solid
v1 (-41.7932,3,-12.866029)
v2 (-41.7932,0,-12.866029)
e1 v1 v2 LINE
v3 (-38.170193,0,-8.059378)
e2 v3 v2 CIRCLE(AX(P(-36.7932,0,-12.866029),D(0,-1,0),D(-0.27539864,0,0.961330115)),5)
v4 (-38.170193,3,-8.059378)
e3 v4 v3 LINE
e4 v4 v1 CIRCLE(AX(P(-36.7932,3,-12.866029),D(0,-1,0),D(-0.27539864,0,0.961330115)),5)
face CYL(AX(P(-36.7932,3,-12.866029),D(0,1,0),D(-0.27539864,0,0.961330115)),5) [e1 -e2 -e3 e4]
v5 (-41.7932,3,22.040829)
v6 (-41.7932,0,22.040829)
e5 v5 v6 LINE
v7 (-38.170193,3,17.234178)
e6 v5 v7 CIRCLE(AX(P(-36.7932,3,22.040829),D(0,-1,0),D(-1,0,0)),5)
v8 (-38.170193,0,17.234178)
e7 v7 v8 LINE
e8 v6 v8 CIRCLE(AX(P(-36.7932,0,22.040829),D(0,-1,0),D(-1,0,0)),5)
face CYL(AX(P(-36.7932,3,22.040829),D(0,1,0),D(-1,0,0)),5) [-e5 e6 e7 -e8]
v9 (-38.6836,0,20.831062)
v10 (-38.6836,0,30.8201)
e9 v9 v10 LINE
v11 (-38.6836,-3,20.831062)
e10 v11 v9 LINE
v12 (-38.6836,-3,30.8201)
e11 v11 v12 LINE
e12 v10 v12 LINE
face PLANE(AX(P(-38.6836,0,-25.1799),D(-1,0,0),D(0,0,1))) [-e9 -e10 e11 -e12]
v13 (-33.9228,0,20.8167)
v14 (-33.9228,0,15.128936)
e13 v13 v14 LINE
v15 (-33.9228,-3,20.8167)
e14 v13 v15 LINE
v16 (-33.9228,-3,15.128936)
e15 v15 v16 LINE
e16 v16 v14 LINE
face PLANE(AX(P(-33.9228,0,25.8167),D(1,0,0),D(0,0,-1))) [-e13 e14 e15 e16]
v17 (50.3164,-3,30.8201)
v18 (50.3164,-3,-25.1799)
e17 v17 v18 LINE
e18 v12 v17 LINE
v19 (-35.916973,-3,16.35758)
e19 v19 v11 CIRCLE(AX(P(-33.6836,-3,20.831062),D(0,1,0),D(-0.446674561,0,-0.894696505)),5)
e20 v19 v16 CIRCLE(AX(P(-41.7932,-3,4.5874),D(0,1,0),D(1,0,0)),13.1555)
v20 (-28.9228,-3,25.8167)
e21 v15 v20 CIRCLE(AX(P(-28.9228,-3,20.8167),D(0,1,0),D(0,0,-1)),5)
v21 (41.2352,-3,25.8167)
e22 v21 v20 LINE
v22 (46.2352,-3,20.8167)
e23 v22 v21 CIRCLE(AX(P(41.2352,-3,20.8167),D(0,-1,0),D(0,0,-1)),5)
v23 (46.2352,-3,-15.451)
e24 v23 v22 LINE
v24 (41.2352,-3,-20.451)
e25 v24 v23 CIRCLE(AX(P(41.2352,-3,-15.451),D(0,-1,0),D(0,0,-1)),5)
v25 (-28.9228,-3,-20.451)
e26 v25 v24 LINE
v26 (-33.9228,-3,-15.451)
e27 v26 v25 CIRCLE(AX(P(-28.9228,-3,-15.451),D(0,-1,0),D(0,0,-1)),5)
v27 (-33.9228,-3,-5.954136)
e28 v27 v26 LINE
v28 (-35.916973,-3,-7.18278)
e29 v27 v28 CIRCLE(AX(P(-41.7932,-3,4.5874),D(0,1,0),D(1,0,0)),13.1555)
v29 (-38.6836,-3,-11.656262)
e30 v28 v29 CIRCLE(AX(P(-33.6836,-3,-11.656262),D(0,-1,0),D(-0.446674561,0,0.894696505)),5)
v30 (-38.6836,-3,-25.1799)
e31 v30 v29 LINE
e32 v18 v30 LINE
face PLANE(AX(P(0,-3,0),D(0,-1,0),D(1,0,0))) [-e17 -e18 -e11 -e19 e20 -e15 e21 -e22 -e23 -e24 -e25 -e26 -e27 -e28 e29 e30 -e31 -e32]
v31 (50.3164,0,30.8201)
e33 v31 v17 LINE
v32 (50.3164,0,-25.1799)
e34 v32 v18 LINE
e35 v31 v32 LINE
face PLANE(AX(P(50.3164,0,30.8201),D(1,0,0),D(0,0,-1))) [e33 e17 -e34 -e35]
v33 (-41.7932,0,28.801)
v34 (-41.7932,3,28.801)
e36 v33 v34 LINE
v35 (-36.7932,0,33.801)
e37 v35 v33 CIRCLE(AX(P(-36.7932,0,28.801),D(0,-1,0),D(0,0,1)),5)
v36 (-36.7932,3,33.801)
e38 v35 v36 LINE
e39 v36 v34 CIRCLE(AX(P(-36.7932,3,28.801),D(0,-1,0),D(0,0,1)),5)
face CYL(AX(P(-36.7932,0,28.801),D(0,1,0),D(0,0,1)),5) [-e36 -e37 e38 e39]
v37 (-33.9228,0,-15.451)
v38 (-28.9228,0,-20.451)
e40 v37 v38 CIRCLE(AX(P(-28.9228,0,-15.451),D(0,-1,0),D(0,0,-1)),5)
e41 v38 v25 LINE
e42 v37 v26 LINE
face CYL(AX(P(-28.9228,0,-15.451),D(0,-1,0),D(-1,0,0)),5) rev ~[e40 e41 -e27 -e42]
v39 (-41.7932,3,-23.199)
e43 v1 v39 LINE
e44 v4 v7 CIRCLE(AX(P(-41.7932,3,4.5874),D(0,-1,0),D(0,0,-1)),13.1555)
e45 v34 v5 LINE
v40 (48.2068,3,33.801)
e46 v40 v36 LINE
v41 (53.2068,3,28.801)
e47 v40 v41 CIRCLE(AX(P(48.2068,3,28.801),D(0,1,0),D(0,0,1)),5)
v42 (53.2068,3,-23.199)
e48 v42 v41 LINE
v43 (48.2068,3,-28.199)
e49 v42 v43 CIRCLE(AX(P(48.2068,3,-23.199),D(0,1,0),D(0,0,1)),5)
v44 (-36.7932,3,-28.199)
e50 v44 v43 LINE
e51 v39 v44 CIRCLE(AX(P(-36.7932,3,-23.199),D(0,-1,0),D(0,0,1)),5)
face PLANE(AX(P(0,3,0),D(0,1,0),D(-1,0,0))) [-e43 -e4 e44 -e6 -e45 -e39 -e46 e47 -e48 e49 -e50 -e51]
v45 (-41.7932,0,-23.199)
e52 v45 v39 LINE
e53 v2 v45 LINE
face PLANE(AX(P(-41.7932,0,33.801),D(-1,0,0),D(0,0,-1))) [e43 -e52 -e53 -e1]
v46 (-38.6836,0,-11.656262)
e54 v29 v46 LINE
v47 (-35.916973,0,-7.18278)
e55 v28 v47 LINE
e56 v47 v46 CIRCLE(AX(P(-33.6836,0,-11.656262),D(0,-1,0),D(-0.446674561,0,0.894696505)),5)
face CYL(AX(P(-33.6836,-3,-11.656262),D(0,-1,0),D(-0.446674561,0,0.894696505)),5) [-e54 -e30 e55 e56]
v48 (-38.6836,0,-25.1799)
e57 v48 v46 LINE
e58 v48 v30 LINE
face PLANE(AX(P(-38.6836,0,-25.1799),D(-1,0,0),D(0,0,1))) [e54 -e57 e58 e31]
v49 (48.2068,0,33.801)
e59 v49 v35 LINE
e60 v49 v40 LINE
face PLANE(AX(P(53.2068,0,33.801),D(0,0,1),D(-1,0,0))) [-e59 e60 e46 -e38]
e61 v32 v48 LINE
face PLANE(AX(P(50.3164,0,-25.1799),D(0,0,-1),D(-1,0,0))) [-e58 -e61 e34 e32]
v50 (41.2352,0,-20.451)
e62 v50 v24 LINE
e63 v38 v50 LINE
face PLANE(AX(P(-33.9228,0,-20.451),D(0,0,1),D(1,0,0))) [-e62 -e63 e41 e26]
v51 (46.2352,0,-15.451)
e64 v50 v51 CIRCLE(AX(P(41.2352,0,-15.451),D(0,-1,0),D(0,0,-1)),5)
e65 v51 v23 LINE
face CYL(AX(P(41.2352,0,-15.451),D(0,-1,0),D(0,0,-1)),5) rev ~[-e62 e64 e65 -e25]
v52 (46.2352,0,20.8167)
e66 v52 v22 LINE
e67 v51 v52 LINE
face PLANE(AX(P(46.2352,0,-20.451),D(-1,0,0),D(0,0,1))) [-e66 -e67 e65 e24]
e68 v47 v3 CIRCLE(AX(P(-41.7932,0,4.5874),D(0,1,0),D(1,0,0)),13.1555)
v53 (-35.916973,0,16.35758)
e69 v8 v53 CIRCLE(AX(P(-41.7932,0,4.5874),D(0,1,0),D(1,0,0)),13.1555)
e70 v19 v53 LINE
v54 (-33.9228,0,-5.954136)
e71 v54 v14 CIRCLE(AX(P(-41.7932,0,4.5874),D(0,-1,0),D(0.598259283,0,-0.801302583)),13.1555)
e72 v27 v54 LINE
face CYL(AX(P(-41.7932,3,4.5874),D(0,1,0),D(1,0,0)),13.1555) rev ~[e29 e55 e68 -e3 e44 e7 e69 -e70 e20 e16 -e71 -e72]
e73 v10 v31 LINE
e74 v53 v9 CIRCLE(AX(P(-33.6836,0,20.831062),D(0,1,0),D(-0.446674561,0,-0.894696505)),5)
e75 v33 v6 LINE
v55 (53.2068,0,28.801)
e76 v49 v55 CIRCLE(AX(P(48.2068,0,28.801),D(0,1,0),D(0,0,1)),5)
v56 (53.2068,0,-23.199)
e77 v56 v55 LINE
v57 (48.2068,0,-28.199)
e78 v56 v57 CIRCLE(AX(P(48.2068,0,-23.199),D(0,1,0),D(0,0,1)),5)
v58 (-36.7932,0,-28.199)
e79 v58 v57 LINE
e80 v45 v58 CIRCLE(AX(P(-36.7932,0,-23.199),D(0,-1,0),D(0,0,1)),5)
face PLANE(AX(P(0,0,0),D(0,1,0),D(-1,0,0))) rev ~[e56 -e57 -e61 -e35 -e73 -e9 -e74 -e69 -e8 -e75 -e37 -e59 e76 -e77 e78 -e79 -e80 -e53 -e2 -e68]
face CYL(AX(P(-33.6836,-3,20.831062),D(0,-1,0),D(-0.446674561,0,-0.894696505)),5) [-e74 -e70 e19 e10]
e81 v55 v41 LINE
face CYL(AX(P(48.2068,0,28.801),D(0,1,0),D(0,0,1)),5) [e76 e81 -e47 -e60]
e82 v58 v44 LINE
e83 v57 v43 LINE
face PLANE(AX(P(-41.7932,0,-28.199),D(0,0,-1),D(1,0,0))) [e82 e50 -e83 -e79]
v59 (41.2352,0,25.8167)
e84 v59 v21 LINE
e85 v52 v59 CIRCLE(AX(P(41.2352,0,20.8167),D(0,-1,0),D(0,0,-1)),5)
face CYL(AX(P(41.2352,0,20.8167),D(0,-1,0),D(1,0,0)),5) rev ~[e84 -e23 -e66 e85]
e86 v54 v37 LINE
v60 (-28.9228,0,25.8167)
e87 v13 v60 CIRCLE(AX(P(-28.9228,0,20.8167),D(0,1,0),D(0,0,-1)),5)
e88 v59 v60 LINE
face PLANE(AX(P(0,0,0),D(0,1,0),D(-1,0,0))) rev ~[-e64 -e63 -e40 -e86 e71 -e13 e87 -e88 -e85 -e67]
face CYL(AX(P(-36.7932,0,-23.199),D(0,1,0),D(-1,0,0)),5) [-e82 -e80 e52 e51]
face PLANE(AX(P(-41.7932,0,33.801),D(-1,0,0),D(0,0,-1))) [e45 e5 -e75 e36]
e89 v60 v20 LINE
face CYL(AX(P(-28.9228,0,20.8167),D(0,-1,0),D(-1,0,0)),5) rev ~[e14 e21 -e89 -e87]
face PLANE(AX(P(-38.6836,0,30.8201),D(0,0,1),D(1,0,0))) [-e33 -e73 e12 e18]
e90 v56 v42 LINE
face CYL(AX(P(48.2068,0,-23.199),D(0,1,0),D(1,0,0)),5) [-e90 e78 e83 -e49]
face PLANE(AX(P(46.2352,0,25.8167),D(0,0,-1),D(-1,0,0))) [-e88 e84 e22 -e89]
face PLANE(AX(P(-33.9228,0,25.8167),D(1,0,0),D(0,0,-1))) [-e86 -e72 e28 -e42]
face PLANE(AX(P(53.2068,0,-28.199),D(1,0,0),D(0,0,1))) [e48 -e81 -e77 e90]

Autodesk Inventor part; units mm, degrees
ref_plane "YZ Plane" through (0, 0, 0) normal (1, 0, 0) x (0, 1, 0)
ref_plane "XZ Plane" through (0, 0, 0) normal (0, 1, 0) x (-1, 0, 0)
ref_plane "XY Plane" through (0, 0, 0) normal (0, 0, 1) x (1, 0, 0)
sketch "Skizze1" plane through (0, 0, 0) normal (0, 1, 0) x (-1, 0, 0)
  line L0 (-53.2068, 33.801) -> (41.7932, 33.801)
  line L1 (41.7932, 33.801) -> (41.7932, -28.199)
  line L2 (41.7932, -28.199) -> (-53.2068, -28.199)
  line L3 (-53.2068, -28.199) -> (-53.2068, 33.801)
  line L4 (-50.2068, 30.801) -> (38.7932, 30.801)
  line L5 (38.7932, 30.801) -> (38.7932, -25.199)
  line L6 (38.7932, -25.199) -> (-50.2068, -25.199)
  line L7 (-50.2068, -25.199) -> (-50.2068, 30.801)
  point P0 (0, 0)
  point P1 (-48.7827, 30.712)
  dimension "d0" = 95
  dimension "d1" = 62
  dimension "d2" = 89
  dimension "d3" = 56
  dimension "d4" = 3
  dimension "d5" = 3
extrude "Extrusion1" add sketch "Skizze1" along normal blind 3 contours L0 L1 L2 L3 | L4 L5 L6 L7
fillet "Rundung1" radius 5 4 edges at (-41.7932, 1.5, -28.199) (53.2068, 1.5, -28.199) (-41.7932, 1.5, 33.801) (53.2068, 1.5, 33.801)
sketch "Skizze2" plane through (0, 0, 0) normal (0, -1, 0) x (1, 0, 0)
  line L0 (-41.6836, 33.8201) -> (53.3164, 33.8201)
  line L1 (53.3164, 33.8201) -> (53.3164, -28.1799)
  line L2 (53.3164, -28.1799) -> (-41.6836, -28.1799)
  line L3 (-41.6836, -28.1799) -> (-41.6836, 33.8201)
  line L4 (-38.6836, 30.8201) -> (50.3164, 30.8201)
  line L5 (50.3164, 30.8201) -> (50.3164, -25.1799)
  line L6 (50.3164, -25.1799) -> (-38.6836, -25.1799)
  line L7 (-38.6836, -25.1799) -> (-38.6836, 30.8201)
  line L8 (46.2352, 25.8167) -> (-33.9228, 25.8167)
  line L9 (-33.9228, 25.8167) -> (-33.9228, -20.451)
  line L10 (-33.9228, -20.451) -> (46.2352, -20.451)
  line L11 (46.2352, -20.451) -> (46.2352, 25.8167)
  point P0 (0, 0)
  point P1 (-89.6071, 35.7543)
  dimension "d9" = 95
  dimension "d10" = 62
  dimension "d11" = 89
  dimension "d12" = 56
  dimension "d13" = 3
  dimension "d14" = 3
extrude "Extrusion2" add sketch "Skizze2" along normal blind 3 contours L4 L5 L6 L7
sketch "Skizze3" plane through (0, 3, 0) normal (0, 1, 0) x (1, 0, 0)
  line L0 (-41.7932, 23.199) -> (-41.7932, -28.801) projected
  circle A0 centre (-41.7932, -4.5874) radius 13.1555
  point P0 (0, 0)
  point P1 (-41.7932, 8.5681)
  point P2 (-41.7932, -17.7429)
extrude "Extrusion3" cut sketch "Skizze3" against normal blind 6 contours A0 L0 picked at (-38.9148, -0.5266)
fillet "Rundung2" radius 5 4 edges at (-41.7932, 1.5, 17.7429) (-41.7932, 1.5, -8.5681) (-38.6836, -1.5, -8.1953) (-38.6836, -1.5, 17.3701)
fillet "Rundung3" radius 5 4 edges at (46.2352, -1.5, 25.8167) (46.2352, -1.5, -20.451) (-33.9228, -1.5, -20.451) (-33.9228, -1.5, 25.8167)
properties part number "top"
